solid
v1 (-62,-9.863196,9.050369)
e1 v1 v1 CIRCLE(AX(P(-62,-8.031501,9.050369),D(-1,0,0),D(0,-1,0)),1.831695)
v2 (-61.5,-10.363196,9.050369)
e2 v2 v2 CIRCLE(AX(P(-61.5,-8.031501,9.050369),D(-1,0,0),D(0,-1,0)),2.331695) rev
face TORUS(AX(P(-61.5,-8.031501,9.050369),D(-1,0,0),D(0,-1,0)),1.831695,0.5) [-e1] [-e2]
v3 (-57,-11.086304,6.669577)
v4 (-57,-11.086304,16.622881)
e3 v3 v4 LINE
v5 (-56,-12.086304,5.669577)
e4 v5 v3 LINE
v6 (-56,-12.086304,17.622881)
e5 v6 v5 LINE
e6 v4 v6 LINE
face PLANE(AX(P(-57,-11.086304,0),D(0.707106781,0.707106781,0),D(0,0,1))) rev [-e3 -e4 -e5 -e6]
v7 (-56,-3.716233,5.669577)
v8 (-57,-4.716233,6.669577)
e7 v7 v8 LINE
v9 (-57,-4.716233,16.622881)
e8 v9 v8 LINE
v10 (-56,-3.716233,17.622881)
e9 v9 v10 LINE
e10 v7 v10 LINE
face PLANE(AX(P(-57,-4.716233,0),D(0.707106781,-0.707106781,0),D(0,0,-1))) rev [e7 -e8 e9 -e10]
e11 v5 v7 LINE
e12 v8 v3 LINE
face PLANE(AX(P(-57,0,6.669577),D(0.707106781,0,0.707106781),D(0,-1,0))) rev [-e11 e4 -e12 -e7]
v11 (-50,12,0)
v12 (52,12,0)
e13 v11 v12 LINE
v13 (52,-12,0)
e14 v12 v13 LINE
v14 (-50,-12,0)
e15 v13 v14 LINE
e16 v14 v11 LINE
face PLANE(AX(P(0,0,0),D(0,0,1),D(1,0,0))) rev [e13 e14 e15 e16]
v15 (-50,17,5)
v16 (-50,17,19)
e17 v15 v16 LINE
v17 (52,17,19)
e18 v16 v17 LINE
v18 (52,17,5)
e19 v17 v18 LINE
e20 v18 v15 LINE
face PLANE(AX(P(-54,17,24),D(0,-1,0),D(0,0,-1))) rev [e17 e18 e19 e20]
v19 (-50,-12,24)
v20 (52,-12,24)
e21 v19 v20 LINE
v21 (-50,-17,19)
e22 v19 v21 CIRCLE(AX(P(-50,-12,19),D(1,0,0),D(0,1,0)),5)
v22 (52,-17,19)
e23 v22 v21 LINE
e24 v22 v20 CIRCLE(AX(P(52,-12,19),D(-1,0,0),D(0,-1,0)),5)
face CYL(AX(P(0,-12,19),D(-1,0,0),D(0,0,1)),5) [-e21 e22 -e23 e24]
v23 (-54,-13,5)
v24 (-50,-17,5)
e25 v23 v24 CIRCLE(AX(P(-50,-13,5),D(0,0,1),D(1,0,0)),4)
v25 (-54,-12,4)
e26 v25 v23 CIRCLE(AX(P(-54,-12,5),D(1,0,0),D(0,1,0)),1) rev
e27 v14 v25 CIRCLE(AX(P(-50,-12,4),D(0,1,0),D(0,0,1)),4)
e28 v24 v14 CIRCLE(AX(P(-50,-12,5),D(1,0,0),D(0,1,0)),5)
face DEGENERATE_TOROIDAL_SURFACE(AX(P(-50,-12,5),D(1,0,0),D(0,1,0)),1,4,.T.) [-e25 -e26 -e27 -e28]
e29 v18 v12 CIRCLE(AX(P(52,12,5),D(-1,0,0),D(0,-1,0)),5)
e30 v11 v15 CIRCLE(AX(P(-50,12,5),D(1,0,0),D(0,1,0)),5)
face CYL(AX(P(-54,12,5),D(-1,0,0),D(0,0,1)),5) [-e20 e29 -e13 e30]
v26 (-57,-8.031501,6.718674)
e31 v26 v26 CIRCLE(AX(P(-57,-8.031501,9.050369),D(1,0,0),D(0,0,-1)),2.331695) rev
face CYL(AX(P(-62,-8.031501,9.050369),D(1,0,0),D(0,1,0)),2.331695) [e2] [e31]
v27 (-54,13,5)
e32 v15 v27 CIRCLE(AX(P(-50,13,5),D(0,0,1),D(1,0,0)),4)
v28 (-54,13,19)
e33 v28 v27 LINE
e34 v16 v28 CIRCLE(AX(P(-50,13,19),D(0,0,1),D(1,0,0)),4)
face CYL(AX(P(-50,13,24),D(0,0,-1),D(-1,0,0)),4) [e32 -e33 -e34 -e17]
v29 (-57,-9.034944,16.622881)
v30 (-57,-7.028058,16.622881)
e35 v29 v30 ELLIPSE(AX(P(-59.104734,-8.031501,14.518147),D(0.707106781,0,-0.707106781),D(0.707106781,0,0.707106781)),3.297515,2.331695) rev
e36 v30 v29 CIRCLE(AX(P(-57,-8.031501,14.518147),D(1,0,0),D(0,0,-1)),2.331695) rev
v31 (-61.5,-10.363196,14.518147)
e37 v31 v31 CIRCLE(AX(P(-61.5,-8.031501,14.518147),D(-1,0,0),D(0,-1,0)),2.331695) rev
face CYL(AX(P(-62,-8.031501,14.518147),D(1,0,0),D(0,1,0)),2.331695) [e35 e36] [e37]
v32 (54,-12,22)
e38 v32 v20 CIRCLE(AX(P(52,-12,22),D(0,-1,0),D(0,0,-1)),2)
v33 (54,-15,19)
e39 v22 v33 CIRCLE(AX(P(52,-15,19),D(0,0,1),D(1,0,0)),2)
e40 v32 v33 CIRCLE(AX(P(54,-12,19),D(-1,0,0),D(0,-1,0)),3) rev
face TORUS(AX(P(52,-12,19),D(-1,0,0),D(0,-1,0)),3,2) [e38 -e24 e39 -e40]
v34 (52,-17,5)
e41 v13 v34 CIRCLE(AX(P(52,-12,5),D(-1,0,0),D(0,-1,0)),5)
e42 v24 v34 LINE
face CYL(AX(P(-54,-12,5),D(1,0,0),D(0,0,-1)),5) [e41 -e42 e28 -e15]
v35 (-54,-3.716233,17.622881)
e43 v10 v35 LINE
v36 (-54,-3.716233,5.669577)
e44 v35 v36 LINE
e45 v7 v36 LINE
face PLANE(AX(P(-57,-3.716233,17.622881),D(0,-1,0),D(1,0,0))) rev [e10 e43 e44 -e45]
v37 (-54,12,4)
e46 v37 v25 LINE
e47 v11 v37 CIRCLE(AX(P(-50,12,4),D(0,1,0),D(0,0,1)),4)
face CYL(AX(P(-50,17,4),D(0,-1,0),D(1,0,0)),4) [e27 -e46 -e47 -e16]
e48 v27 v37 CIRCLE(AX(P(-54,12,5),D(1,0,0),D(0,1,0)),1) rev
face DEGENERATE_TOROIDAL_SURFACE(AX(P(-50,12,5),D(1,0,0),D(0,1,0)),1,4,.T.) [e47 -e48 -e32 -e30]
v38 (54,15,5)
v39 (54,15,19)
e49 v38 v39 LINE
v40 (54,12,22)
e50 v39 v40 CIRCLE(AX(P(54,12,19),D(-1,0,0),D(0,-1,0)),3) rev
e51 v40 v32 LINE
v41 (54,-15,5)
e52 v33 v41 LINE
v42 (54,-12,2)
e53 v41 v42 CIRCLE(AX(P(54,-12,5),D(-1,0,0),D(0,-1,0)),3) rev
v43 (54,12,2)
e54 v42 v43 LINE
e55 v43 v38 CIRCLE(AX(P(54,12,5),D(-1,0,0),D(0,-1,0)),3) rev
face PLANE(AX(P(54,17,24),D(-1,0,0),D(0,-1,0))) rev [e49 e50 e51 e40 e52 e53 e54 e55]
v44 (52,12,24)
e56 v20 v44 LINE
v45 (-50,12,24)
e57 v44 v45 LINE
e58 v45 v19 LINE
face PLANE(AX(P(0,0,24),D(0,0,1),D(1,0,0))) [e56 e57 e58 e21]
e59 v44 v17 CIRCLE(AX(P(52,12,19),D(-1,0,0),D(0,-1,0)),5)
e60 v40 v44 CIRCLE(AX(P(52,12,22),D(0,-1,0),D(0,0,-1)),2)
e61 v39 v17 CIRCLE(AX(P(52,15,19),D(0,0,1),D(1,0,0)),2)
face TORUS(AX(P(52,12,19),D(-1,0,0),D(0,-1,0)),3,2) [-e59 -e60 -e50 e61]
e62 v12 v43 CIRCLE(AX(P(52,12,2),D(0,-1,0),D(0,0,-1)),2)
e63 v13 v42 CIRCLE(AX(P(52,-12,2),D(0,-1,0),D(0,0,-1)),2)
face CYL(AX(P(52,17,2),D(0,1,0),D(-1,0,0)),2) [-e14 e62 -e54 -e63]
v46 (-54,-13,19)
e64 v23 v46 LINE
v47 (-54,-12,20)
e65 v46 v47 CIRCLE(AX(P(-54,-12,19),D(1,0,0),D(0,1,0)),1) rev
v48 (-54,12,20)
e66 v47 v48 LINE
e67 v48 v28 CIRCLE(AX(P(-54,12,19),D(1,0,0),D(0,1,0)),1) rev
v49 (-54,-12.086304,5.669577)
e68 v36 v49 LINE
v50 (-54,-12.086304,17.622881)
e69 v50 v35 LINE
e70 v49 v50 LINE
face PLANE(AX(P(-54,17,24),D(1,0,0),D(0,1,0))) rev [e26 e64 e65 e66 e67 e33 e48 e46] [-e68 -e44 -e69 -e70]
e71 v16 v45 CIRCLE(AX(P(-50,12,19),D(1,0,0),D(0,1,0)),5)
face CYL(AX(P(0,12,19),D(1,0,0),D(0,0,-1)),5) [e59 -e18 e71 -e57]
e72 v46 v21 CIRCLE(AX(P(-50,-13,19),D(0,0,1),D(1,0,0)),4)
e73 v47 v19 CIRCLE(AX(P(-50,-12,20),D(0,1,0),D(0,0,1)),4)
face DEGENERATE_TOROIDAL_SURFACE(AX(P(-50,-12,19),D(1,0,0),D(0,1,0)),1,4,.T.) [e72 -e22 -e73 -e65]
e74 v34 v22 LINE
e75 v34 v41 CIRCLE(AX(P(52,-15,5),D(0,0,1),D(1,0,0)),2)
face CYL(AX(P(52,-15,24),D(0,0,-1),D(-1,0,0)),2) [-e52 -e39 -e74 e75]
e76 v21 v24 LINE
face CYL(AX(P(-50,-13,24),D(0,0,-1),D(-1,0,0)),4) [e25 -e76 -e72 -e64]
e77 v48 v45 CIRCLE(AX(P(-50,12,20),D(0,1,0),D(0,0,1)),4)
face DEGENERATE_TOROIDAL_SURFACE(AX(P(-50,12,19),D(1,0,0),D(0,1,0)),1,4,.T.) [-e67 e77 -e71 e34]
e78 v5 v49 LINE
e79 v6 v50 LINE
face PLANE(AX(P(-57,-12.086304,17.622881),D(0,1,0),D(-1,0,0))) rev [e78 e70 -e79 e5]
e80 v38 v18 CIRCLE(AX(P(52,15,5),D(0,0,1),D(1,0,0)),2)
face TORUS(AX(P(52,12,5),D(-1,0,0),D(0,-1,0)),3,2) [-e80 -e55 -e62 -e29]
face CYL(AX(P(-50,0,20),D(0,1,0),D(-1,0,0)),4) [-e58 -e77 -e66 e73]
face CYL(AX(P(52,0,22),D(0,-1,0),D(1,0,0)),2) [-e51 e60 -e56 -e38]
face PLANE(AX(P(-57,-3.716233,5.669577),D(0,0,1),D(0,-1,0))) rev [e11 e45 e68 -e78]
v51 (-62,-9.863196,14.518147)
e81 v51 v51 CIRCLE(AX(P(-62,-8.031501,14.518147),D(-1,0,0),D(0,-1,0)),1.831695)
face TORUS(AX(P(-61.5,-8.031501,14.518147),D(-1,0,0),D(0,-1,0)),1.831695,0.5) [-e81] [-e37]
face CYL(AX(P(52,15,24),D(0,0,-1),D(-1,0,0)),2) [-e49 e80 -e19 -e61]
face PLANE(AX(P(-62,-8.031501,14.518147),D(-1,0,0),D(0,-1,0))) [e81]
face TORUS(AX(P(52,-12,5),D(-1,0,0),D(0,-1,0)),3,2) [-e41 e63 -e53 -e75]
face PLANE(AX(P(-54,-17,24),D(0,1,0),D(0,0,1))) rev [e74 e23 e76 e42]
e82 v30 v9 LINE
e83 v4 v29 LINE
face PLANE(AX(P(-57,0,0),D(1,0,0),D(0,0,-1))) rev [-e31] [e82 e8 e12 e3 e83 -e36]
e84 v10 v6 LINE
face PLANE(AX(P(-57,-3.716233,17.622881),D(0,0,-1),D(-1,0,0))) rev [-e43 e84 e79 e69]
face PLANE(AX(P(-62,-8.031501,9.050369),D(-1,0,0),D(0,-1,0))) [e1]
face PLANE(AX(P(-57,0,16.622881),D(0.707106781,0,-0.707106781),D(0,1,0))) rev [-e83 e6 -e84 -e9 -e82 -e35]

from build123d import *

# Parameters (mm, degrees)
SKETCH1_W           = 108
SKETCH1_H           = 34
BOSS_EXTRUDE1_DEPTH = 24
FILLET1_R           = 5
SKETCH2_W           = 11.95330434
SKETCH2_H           = 8.370070963
BOSS_EXTRUDE2_DEPTH = 3
SKETCH4_R           = 2.331694998
BOSS_EXTRUDE3_DEPTH = 8
FILLET2_R           = 0.5
CHAMFER1_SIZE       = 1
FILLET4_R           = 4
FILLET5_R           = 2


with BuildPart() as part:
    # Sketch1 → Boss-Extrude1 (new body)
    with BuildSketch(Plane.XY):
        Rectangle(SKETCH1_W, SKETCH1_H)
    extrude(amount=BOSS_EXTRUDE1_DEPTH)

    # Fillet1
    fillet1_edges = [part.edges().sort_by_distance(p)[0] for p in [
        (0, -17, 24),
        (0, -17, 0),
        (0, 17, 0),
        (0, 17, 24),
    ]]
    fillet(fillet1_edges, radius=FILLET1_R)

    # Sketch2 → Boss-Extrude2 (add)
    with BuildSketch(Plane.ZY.offset(54)):
        with Locations((11.64622902, -7.901268425)):
            Rectangle(SKETCH2_W, SKETCH2_H)
    extrude(amount=BOSS_EXTRUDE2_DEPTH)

    # Sketch4 → Boss-Extrude3 (add)
    with BuildSketch(Plane.ZY.offset(54)):
        with Locations(Location((14.518147435, -8.031501174, 0), (0, 0, 180))):
            Circle(SKETCH4_R)
        with Locations(Location((9.050368945, -8.031501174, 0), (0, 0, 180))):
            Circle(SKETCH4_R)
    extrude(amount=BOSS_EXTRUDE3_DEPTH)

    # Fillet2
    fillet2_edges = [part.edges().sort_by_distance(p)[0] for p in [
        (-62, -8.031501174, 16.849842433),
        (-62, -8.031501174, 11.382063944),
    ]]
    fillet(fillet2_edges, radius=FILLET2_R)

    # Chamfer1
    # the kernel refuses this chamfer: 1 mm, written as the material it takes off along each edge
    with BuildSketch(Plane(origin=(-57, -14.657986894, 17.62288119), x_dir=(-0.0274958766105891, 0, -0.9996219169112968), z_dir=(0, 1, 0))) as chamfer1_piece_1_section:
        Polygon((CHAMFER1_SIZE * 0.999621916911, -CHAMFER1_SIZE * 0.0274958766106), (-CHAMFER1_SIZE * 0.0274958766106, -CHAMFER1_SIZE * 0.999621916911), (0, 0), align=None)
    chamfer1_piece_1 = extrude(amount=13.513436938, mode=Mode.PRIVATE)
    chamfer1_piece_1 = chamfer1_piece_1 - Plane(origin=(-56.66854021, -8.031501174, 14.518147435), x_dir=(0, 0, -1), z_dir=(1, 0, 0)) * Cylinder(2.331694998, 32, mode=Mode.PRIVATE)
    add(chamfer1_piece_1, mode=Mode.SUBTRACT)
    with BuildSketch(Plane(origin=(-57, -3.716232943, 20.194564177), x_dir=(-0.02749587661058907, -0.9996219169112965, 0), z_dir=(0, 0, -1)), Plane(origin=(-57, -12.086303906, 3.097893862), x_dir=(-0.0274958766105891, 0.9996219169112968, 0), z_dir=(0, 0, 1))) as chamfer1_piece_2:
        Polygon((CHAMFER1_SIZE * 0.999621916911, -CHAMFER1_SIZE * 0.0274958766106), (-CHAMFER1_SIZE * 0.0274958766106, -CHAMFER1_SIZE * 0.999621916911), (0, 0), align=None)
    extrude(amount=17.096670315, mode=Mode.SUBTRACT)
    with BuildSketch(Plane(origin=(-57, -1.144549955, 5.66957685), x_dir=(-0.02749587661058907, 0, 0.9996219169112965), z_dir=(0, -1, 0))) as chamfer1_piece_3:
        Polygon((CHAMFER1_SIZE * 0.999621916911, -CHAMFER1_SIZE * 0.0274958766106), (-CHAMFER1_SIZE * 0.0274958766106, -CHAMFER1_SIZE * 0.999621916911), (0, 0), align=None)
    extrude(amount=13.513436938, mode=Mode.SUBTRACT)

    # Fillet4
    fillet4_edges = [part.edges().sort_by_distance(p)[0] for p in [
        (-54, 17, 12),
        (-54, 0, 0),
        (-54, -17, 12),
        (-54, 0, 24),
        (-54, -15.535533906, 22.535533906),
        (-54, -15.535533906, 1.464466094),
        (-54, 15.535533906, 22.535533906),
        (-54, 15.535533906, 1.464466094),
    ]]
    fillet(fillet4_edges, radius=FILLET4_R)

    # Fillet5
    fillet5_edges = [part.edges().sort_by_distance(p)[0] for p in [
        (54, 17, 12),
        (54, 0, 0),
        (54, 0, 24),
        (54, -17, 12),
        (54, -15.535533906, 22.535533906),
        (54, -15.535533906, 1.464466094),
        (54, 15.535533906, 22.535533906),
        (54, 15.535533906, 1.464466094),
    ]]
    fillet(fillet5_edges, radius=FILLET5_R)


solid = part.part
